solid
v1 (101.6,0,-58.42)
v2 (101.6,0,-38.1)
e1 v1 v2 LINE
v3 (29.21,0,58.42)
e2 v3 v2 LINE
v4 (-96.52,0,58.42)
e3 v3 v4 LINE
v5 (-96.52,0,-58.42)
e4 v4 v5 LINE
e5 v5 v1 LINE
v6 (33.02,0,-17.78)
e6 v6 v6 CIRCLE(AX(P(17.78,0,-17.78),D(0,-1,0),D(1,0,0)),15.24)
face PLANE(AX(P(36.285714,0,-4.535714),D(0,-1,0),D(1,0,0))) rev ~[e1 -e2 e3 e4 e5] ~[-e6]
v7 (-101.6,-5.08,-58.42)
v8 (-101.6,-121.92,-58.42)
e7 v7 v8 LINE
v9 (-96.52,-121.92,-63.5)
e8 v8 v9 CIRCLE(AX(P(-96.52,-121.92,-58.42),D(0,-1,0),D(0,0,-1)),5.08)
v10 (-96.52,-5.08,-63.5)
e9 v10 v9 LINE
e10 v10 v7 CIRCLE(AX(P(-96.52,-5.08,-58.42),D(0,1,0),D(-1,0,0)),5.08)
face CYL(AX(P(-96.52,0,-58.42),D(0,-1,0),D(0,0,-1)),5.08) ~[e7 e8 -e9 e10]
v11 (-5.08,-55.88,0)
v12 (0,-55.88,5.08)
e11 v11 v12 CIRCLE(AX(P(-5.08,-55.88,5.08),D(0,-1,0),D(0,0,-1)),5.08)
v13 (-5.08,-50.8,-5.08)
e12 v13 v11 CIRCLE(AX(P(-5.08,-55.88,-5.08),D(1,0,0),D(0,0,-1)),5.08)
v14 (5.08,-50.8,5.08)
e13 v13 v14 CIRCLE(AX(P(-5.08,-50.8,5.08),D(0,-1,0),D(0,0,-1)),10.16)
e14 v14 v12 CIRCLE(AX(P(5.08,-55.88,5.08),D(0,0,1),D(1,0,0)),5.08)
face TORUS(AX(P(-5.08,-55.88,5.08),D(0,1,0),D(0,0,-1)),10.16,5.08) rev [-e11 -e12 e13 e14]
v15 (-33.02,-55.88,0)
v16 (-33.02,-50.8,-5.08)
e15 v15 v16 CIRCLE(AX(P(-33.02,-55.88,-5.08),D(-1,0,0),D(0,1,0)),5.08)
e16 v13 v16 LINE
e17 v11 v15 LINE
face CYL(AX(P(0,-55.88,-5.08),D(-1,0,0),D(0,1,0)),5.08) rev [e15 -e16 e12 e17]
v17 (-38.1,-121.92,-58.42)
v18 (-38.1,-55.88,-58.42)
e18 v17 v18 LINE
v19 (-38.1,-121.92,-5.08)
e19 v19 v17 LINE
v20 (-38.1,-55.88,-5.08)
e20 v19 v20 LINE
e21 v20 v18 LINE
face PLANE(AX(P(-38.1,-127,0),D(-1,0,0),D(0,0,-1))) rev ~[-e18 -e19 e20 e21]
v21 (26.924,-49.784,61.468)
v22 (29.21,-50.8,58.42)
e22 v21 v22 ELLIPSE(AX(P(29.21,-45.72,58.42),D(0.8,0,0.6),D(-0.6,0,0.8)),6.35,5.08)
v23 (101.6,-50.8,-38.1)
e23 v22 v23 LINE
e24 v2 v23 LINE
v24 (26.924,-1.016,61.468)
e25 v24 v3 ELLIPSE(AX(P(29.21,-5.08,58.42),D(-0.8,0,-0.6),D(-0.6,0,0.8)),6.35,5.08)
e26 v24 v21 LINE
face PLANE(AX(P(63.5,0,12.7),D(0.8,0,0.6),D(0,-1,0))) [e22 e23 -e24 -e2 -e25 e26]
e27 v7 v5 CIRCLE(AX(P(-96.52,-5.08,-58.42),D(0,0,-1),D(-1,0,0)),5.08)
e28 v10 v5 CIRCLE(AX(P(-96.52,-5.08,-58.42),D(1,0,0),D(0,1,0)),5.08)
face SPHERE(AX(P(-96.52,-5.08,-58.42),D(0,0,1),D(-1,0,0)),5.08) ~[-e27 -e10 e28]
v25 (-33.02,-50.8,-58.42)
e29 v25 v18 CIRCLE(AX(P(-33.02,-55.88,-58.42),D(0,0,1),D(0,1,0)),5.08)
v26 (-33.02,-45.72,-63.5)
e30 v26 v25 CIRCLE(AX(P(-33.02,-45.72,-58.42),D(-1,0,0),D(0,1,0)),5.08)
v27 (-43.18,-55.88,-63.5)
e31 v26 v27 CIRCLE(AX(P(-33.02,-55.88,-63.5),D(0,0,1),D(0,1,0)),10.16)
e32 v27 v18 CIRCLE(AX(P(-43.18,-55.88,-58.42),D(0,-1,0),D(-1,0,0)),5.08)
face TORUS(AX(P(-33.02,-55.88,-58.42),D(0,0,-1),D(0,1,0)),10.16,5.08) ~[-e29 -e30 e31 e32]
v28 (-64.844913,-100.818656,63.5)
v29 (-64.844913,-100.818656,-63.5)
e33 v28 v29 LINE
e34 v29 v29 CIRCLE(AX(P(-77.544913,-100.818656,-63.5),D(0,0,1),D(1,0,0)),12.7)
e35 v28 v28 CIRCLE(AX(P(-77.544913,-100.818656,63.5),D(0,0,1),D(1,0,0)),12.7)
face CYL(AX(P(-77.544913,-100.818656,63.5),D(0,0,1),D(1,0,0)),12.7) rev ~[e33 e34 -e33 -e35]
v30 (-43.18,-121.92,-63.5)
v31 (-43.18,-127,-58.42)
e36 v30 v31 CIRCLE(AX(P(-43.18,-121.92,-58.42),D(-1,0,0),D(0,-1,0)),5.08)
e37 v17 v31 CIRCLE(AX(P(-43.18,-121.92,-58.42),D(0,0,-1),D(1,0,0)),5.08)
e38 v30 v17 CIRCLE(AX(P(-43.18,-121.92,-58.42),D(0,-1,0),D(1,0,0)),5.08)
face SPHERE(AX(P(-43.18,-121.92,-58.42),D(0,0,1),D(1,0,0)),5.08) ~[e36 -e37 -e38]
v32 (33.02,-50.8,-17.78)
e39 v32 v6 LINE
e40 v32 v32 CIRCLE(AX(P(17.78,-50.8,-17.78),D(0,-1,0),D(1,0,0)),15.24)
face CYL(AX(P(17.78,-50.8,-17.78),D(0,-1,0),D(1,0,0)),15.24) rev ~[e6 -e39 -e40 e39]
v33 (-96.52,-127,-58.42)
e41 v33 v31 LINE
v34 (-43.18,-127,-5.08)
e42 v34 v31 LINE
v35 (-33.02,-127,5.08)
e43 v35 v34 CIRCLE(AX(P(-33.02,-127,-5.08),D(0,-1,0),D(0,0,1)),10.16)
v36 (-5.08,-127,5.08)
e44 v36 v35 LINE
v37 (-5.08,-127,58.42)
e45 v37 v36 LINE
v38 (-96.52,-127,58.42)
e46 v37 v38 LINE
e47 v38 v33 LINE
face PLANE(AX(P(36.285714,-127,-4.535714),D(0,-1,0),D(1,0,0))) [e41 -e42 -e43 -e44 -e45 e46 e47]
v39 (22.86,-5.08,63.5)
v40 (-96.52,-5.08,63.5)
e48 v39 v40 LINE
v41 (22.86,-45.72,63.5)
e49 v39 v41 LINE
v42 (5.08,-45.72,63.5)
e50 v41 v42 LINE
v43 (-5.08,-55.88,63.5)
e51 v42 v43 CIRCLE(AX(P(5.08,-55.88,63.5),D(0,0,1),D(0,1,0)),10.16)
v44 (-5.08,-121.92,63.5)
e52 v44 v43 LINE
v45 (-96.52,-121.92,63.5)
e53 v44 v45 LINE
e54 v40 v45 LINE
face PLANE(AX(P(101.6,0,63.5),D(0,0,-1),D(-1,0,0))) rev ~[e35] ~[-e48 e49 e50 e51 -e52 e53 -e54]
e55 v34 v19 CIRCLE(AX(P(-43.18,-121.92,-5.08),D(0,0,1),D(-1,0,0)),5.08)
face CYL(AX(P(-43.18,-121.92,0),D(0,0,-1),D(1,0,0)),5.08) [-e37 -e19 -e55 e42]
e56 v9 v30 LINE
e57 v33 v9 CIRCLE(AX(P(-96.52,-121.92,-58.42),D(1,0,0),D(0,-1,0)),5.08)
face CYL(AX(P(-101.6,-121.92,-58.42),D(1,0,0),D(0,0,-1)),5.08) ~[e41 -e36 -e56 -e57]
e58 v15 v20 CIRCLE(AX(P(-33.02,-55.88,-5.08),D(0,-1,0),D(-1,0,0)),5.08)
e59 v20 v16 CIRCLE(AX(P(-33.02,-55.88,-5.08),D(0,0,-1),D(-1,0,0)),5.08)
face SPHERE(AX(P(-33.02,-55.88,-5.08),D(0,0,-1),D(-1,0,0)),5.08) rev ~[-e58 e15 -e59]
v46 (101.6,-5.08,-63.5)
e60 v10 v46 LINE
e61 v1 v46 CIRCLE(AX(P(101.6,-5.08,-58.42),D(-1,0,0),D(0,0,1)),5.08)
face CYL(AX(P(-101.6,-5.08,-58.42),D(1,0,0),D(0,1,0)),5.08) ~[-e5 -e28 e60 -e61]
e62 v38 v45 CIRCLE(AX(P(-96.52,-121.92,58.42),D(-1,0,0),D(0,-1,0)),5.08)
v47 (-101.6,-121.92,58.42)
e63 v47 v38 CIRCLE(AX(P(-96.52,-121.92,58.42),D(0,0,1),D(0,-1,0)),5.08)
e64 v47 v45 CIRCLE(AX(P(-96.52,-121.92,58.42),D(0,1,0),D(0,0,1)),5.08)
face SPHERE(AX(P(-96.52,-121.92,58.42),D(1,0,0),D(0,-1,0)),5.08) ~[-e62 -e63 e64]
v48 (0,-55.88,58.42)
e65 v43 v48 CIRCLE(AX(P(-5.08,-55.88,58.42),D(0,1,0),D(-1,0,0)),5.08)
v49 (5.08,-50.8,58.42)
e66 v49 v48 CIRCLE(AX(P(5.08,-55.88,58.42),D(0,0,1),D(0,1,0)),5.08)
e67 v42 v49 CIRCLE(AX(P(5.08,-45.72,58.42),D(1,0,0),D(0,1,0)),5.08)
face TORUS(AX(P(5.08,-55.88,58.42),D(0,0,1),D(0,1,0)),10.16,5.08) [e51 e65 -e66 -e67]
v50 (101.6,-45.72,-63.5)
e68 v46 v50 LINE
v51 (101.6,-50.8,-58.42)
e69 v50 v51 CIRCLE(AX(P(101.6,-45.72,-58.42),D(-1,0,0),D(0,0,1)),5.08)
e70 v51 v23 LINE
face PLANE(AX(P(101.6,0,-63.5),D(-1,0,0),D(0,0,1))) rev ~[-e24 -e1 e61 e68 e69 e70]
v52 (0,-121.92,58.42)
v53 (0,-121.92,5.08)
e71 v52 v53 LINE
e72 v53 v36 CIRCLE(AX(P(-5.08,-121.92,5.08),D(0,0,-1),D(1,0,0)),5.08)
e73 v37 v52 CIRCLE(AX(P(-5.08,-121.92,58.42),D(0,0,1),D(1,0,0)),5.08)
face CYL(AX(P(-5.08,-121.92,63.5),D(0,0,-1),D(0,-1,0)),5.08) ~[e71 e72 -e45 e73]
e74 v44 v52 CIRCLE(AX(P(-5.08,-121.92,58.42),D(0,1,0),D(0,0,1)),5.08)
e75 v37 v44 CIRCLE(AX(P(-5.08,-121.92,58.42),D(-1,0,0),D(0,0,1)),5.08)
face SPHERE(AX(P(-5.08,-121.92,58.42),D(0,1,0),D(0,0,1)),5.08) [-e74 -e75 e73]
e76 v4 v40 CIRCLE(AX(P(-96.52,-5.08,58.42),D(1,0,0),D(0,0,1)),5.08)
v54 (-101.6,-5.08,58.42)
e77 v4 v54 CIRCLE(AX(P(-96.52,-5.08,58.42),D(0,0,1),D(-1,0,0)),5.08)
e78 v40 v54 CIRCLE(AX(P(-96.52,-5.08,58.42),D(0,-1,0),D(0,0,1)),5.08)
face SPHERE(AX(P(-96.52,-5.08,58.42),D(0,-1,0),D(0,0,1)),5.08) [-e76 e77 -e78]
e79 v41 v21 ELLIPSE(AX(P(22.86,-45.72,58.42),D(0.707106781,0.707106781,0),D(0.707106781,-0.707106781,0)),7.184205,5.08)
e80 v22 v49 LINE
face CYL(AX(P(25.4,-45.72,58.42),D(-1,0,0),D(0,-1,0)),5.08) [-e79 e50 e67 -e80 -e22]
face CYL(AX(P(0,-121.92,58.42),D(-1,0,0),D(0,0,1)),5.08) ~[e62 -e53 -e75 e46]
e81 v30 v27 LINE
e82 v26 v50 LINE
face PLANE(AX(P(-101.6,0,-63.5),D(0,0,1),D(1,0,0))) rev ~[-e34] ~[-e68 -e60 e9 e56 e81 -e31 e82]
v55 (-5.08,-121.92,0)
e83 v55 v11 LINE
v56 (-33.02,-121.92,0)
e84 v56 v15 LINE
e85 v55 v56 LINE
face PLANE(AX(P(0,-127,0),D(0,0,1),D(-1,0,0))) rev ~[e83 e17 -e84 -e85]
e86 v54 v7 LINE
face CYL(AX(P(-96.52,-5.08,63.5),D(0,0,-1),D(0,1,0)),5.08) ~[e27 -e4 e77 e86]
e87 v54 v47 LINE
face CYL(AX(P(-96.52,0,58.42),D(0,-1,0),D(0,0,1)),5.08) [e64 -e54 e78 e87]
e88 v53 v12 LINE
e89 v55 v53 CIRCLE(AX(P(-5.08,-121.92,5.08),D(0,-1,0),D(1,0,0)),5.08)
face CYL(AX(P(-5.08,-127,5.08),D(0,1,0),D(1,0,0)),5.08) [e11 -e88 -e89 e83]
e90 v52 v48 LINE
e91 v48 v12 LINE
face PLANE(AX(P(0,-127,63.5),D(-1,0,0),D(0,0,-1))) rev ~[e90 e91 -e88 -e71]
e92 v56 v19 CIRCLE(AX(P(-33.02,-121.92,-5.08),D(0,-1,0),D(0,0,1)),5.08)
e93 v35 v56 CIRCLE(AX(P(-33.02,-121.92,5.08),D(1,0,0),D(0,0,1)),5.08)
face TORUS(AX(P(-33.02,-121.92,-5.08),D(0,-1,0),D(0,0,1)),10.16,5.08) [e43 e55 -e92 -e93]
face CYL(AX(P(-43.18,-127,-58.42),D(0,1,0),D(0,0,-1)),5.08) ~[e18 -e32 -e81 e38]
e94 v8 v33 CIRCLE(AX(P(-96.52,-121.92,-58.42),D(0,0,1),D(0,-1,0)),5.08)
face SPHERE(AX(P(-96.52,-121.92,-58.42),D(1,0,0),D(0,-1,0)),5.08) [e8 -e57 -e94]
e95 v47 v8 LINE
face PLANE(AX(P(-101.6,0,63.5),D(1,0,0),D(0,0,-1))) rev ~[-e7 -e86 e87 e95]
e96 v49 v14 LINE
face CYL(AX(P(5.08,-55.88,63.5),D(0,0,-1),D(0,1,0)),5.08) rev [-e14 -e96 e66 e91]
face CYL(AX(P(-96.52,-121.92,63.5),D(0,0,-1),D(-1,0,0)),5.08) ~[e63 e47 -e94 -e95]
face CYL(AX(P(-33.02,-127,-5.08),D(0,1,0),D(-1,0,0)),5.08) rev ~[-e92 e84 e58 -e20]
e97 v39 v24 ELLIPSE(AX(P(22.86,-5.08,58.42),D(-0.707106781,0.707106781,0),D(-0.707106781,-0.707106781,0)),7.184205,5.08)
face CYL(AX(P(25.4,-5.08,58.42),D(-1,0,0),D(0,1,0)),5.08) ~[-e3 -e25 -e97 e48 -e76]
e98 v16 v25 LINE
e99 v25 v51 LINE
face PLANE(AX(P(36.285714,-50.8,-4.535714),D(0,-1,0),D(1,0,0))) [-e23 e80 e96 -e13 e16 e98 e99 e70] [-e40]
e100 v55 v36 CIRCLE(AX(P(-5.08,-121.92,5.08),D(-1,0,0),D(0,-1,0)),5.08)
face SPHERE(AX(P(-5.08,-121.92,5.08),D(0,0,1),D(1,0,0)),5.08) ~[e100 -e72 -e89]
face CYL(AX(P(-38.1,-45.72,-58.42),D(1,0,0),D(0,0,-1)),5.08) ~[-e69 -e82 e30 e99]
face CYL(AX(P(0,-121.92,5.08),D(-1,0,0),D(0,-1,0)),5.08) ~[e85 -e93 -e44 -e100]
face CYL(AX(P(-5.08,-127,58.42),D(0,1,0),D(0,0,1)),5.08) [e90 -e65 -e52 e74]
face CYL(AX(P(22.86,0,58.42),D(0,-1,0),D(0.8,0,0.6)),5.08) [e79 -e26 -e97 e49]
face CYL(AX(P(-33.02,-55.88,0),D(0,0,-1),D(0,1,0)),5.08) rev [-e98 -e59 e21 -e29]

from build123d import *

# Parameters (mm, degrees)
F1_DEPTH = 127
F3_DEPTH = 76.2
F4_SIZE2 = 101.6
F4_SIZE  = 76.2
F5_R     = 5.08
F6_R     = 15.24
F7_DEPTH = 50.8
F8_R     = 12.7
F9_DEPTH = 127


with BuildPart() as f1:
    # F0 (on Front) → F1 (new body)
    with BuildSketch(Plane.XZ):
        Polygon((-38.1, -63.5), (101.6, -63.5), (101.6, 63.5), (0, 63.5), (0, 0), (-38.1, 0), align=None)
        Polygon((-101.6, -63.5), (-38.1, -63.5), (-38.1, 0), (0, 0), (0, 63.5), (-101.6, 63.5), align=None)
    extrude(amount=F1_DEPTH)

    # F2 (on face) → F3 (cut)
    with BuildSketch(Plane.XZ.offset(127)):
        Polygon((-38.1, 0), (-38.1, -63.5), (101.6, -63.5), (101.6, 63.5), (0, 63.5), (0, 0), align=None)
    extrude(amount=-F3_DEPTH, mode=Mode.SUBTRACT)

    # F4
    f4_edges = [f1.edges().sort_by_distance(p)[0] for p in [
        (101.6, -25.4, 63.5),
    ]]
    f4_side = f1.faces().sort_by_distance((-21.771429, -52.614286, 63.5))[0]
    chamfer(f4_edges, length=F4_SIZE, length2=F4_SIZE2, reference=f4_side)

    # F5
    f5_edges = [f1.edges().sort_by_distance(p)[0] for p in [
        (12.7, -50.8, 63.5),
        (25.4, -25.4, 63.5),
        (0, -88.9, 63.5),
        (-50.8, -127, 63.5),
        (0, -127, 31.75),
        (0, -88.9, 0),
        (-19.05, -127, 0),
        (-38.1, -127, -31.75),
        (-38.1, -88.9, -63.5),
        (-69.85, -127, -63.5),
        (-101.6, -127, 0),
        (-101.6, -63.5, 63.5),
        (-38.1, 0, 63.5),
        (-38.1, -50.8, -31.75),
        (-38.1, -88.9, 0),
        (-19.05, -50.8, 0),
        (-101.6, 0, 0),
        (-101.6, -63.5, -63.5),
        (0, 0, -63.5),
        (31.75, -50.8, -63.5),
        (0, -50.8, 31.75),
    ]]
    fillet(f5_edges, radius=F5_R)

    # F6 (on face) → F7 (cut, through all)
    with BuildSketch(Plane.XZ.offset(50.8)):
        with Locations((17.78, -17.78)):
            Circle(F6_R)
    extrude(amount=-F7_DEPTH, mode=Mode.SUBTRACT)

    # F8 (on face) → F9 (cut, through all)
    with BuildSketch(Plane.XY.offset(63.5)):
        with Locations((-77.5449126959, -100.8186563849)):
            Circle(F8_R)
    extrude(amount=-F9_DEPTH, mode=Mode.SUBTRACT)


solid = f1.part
